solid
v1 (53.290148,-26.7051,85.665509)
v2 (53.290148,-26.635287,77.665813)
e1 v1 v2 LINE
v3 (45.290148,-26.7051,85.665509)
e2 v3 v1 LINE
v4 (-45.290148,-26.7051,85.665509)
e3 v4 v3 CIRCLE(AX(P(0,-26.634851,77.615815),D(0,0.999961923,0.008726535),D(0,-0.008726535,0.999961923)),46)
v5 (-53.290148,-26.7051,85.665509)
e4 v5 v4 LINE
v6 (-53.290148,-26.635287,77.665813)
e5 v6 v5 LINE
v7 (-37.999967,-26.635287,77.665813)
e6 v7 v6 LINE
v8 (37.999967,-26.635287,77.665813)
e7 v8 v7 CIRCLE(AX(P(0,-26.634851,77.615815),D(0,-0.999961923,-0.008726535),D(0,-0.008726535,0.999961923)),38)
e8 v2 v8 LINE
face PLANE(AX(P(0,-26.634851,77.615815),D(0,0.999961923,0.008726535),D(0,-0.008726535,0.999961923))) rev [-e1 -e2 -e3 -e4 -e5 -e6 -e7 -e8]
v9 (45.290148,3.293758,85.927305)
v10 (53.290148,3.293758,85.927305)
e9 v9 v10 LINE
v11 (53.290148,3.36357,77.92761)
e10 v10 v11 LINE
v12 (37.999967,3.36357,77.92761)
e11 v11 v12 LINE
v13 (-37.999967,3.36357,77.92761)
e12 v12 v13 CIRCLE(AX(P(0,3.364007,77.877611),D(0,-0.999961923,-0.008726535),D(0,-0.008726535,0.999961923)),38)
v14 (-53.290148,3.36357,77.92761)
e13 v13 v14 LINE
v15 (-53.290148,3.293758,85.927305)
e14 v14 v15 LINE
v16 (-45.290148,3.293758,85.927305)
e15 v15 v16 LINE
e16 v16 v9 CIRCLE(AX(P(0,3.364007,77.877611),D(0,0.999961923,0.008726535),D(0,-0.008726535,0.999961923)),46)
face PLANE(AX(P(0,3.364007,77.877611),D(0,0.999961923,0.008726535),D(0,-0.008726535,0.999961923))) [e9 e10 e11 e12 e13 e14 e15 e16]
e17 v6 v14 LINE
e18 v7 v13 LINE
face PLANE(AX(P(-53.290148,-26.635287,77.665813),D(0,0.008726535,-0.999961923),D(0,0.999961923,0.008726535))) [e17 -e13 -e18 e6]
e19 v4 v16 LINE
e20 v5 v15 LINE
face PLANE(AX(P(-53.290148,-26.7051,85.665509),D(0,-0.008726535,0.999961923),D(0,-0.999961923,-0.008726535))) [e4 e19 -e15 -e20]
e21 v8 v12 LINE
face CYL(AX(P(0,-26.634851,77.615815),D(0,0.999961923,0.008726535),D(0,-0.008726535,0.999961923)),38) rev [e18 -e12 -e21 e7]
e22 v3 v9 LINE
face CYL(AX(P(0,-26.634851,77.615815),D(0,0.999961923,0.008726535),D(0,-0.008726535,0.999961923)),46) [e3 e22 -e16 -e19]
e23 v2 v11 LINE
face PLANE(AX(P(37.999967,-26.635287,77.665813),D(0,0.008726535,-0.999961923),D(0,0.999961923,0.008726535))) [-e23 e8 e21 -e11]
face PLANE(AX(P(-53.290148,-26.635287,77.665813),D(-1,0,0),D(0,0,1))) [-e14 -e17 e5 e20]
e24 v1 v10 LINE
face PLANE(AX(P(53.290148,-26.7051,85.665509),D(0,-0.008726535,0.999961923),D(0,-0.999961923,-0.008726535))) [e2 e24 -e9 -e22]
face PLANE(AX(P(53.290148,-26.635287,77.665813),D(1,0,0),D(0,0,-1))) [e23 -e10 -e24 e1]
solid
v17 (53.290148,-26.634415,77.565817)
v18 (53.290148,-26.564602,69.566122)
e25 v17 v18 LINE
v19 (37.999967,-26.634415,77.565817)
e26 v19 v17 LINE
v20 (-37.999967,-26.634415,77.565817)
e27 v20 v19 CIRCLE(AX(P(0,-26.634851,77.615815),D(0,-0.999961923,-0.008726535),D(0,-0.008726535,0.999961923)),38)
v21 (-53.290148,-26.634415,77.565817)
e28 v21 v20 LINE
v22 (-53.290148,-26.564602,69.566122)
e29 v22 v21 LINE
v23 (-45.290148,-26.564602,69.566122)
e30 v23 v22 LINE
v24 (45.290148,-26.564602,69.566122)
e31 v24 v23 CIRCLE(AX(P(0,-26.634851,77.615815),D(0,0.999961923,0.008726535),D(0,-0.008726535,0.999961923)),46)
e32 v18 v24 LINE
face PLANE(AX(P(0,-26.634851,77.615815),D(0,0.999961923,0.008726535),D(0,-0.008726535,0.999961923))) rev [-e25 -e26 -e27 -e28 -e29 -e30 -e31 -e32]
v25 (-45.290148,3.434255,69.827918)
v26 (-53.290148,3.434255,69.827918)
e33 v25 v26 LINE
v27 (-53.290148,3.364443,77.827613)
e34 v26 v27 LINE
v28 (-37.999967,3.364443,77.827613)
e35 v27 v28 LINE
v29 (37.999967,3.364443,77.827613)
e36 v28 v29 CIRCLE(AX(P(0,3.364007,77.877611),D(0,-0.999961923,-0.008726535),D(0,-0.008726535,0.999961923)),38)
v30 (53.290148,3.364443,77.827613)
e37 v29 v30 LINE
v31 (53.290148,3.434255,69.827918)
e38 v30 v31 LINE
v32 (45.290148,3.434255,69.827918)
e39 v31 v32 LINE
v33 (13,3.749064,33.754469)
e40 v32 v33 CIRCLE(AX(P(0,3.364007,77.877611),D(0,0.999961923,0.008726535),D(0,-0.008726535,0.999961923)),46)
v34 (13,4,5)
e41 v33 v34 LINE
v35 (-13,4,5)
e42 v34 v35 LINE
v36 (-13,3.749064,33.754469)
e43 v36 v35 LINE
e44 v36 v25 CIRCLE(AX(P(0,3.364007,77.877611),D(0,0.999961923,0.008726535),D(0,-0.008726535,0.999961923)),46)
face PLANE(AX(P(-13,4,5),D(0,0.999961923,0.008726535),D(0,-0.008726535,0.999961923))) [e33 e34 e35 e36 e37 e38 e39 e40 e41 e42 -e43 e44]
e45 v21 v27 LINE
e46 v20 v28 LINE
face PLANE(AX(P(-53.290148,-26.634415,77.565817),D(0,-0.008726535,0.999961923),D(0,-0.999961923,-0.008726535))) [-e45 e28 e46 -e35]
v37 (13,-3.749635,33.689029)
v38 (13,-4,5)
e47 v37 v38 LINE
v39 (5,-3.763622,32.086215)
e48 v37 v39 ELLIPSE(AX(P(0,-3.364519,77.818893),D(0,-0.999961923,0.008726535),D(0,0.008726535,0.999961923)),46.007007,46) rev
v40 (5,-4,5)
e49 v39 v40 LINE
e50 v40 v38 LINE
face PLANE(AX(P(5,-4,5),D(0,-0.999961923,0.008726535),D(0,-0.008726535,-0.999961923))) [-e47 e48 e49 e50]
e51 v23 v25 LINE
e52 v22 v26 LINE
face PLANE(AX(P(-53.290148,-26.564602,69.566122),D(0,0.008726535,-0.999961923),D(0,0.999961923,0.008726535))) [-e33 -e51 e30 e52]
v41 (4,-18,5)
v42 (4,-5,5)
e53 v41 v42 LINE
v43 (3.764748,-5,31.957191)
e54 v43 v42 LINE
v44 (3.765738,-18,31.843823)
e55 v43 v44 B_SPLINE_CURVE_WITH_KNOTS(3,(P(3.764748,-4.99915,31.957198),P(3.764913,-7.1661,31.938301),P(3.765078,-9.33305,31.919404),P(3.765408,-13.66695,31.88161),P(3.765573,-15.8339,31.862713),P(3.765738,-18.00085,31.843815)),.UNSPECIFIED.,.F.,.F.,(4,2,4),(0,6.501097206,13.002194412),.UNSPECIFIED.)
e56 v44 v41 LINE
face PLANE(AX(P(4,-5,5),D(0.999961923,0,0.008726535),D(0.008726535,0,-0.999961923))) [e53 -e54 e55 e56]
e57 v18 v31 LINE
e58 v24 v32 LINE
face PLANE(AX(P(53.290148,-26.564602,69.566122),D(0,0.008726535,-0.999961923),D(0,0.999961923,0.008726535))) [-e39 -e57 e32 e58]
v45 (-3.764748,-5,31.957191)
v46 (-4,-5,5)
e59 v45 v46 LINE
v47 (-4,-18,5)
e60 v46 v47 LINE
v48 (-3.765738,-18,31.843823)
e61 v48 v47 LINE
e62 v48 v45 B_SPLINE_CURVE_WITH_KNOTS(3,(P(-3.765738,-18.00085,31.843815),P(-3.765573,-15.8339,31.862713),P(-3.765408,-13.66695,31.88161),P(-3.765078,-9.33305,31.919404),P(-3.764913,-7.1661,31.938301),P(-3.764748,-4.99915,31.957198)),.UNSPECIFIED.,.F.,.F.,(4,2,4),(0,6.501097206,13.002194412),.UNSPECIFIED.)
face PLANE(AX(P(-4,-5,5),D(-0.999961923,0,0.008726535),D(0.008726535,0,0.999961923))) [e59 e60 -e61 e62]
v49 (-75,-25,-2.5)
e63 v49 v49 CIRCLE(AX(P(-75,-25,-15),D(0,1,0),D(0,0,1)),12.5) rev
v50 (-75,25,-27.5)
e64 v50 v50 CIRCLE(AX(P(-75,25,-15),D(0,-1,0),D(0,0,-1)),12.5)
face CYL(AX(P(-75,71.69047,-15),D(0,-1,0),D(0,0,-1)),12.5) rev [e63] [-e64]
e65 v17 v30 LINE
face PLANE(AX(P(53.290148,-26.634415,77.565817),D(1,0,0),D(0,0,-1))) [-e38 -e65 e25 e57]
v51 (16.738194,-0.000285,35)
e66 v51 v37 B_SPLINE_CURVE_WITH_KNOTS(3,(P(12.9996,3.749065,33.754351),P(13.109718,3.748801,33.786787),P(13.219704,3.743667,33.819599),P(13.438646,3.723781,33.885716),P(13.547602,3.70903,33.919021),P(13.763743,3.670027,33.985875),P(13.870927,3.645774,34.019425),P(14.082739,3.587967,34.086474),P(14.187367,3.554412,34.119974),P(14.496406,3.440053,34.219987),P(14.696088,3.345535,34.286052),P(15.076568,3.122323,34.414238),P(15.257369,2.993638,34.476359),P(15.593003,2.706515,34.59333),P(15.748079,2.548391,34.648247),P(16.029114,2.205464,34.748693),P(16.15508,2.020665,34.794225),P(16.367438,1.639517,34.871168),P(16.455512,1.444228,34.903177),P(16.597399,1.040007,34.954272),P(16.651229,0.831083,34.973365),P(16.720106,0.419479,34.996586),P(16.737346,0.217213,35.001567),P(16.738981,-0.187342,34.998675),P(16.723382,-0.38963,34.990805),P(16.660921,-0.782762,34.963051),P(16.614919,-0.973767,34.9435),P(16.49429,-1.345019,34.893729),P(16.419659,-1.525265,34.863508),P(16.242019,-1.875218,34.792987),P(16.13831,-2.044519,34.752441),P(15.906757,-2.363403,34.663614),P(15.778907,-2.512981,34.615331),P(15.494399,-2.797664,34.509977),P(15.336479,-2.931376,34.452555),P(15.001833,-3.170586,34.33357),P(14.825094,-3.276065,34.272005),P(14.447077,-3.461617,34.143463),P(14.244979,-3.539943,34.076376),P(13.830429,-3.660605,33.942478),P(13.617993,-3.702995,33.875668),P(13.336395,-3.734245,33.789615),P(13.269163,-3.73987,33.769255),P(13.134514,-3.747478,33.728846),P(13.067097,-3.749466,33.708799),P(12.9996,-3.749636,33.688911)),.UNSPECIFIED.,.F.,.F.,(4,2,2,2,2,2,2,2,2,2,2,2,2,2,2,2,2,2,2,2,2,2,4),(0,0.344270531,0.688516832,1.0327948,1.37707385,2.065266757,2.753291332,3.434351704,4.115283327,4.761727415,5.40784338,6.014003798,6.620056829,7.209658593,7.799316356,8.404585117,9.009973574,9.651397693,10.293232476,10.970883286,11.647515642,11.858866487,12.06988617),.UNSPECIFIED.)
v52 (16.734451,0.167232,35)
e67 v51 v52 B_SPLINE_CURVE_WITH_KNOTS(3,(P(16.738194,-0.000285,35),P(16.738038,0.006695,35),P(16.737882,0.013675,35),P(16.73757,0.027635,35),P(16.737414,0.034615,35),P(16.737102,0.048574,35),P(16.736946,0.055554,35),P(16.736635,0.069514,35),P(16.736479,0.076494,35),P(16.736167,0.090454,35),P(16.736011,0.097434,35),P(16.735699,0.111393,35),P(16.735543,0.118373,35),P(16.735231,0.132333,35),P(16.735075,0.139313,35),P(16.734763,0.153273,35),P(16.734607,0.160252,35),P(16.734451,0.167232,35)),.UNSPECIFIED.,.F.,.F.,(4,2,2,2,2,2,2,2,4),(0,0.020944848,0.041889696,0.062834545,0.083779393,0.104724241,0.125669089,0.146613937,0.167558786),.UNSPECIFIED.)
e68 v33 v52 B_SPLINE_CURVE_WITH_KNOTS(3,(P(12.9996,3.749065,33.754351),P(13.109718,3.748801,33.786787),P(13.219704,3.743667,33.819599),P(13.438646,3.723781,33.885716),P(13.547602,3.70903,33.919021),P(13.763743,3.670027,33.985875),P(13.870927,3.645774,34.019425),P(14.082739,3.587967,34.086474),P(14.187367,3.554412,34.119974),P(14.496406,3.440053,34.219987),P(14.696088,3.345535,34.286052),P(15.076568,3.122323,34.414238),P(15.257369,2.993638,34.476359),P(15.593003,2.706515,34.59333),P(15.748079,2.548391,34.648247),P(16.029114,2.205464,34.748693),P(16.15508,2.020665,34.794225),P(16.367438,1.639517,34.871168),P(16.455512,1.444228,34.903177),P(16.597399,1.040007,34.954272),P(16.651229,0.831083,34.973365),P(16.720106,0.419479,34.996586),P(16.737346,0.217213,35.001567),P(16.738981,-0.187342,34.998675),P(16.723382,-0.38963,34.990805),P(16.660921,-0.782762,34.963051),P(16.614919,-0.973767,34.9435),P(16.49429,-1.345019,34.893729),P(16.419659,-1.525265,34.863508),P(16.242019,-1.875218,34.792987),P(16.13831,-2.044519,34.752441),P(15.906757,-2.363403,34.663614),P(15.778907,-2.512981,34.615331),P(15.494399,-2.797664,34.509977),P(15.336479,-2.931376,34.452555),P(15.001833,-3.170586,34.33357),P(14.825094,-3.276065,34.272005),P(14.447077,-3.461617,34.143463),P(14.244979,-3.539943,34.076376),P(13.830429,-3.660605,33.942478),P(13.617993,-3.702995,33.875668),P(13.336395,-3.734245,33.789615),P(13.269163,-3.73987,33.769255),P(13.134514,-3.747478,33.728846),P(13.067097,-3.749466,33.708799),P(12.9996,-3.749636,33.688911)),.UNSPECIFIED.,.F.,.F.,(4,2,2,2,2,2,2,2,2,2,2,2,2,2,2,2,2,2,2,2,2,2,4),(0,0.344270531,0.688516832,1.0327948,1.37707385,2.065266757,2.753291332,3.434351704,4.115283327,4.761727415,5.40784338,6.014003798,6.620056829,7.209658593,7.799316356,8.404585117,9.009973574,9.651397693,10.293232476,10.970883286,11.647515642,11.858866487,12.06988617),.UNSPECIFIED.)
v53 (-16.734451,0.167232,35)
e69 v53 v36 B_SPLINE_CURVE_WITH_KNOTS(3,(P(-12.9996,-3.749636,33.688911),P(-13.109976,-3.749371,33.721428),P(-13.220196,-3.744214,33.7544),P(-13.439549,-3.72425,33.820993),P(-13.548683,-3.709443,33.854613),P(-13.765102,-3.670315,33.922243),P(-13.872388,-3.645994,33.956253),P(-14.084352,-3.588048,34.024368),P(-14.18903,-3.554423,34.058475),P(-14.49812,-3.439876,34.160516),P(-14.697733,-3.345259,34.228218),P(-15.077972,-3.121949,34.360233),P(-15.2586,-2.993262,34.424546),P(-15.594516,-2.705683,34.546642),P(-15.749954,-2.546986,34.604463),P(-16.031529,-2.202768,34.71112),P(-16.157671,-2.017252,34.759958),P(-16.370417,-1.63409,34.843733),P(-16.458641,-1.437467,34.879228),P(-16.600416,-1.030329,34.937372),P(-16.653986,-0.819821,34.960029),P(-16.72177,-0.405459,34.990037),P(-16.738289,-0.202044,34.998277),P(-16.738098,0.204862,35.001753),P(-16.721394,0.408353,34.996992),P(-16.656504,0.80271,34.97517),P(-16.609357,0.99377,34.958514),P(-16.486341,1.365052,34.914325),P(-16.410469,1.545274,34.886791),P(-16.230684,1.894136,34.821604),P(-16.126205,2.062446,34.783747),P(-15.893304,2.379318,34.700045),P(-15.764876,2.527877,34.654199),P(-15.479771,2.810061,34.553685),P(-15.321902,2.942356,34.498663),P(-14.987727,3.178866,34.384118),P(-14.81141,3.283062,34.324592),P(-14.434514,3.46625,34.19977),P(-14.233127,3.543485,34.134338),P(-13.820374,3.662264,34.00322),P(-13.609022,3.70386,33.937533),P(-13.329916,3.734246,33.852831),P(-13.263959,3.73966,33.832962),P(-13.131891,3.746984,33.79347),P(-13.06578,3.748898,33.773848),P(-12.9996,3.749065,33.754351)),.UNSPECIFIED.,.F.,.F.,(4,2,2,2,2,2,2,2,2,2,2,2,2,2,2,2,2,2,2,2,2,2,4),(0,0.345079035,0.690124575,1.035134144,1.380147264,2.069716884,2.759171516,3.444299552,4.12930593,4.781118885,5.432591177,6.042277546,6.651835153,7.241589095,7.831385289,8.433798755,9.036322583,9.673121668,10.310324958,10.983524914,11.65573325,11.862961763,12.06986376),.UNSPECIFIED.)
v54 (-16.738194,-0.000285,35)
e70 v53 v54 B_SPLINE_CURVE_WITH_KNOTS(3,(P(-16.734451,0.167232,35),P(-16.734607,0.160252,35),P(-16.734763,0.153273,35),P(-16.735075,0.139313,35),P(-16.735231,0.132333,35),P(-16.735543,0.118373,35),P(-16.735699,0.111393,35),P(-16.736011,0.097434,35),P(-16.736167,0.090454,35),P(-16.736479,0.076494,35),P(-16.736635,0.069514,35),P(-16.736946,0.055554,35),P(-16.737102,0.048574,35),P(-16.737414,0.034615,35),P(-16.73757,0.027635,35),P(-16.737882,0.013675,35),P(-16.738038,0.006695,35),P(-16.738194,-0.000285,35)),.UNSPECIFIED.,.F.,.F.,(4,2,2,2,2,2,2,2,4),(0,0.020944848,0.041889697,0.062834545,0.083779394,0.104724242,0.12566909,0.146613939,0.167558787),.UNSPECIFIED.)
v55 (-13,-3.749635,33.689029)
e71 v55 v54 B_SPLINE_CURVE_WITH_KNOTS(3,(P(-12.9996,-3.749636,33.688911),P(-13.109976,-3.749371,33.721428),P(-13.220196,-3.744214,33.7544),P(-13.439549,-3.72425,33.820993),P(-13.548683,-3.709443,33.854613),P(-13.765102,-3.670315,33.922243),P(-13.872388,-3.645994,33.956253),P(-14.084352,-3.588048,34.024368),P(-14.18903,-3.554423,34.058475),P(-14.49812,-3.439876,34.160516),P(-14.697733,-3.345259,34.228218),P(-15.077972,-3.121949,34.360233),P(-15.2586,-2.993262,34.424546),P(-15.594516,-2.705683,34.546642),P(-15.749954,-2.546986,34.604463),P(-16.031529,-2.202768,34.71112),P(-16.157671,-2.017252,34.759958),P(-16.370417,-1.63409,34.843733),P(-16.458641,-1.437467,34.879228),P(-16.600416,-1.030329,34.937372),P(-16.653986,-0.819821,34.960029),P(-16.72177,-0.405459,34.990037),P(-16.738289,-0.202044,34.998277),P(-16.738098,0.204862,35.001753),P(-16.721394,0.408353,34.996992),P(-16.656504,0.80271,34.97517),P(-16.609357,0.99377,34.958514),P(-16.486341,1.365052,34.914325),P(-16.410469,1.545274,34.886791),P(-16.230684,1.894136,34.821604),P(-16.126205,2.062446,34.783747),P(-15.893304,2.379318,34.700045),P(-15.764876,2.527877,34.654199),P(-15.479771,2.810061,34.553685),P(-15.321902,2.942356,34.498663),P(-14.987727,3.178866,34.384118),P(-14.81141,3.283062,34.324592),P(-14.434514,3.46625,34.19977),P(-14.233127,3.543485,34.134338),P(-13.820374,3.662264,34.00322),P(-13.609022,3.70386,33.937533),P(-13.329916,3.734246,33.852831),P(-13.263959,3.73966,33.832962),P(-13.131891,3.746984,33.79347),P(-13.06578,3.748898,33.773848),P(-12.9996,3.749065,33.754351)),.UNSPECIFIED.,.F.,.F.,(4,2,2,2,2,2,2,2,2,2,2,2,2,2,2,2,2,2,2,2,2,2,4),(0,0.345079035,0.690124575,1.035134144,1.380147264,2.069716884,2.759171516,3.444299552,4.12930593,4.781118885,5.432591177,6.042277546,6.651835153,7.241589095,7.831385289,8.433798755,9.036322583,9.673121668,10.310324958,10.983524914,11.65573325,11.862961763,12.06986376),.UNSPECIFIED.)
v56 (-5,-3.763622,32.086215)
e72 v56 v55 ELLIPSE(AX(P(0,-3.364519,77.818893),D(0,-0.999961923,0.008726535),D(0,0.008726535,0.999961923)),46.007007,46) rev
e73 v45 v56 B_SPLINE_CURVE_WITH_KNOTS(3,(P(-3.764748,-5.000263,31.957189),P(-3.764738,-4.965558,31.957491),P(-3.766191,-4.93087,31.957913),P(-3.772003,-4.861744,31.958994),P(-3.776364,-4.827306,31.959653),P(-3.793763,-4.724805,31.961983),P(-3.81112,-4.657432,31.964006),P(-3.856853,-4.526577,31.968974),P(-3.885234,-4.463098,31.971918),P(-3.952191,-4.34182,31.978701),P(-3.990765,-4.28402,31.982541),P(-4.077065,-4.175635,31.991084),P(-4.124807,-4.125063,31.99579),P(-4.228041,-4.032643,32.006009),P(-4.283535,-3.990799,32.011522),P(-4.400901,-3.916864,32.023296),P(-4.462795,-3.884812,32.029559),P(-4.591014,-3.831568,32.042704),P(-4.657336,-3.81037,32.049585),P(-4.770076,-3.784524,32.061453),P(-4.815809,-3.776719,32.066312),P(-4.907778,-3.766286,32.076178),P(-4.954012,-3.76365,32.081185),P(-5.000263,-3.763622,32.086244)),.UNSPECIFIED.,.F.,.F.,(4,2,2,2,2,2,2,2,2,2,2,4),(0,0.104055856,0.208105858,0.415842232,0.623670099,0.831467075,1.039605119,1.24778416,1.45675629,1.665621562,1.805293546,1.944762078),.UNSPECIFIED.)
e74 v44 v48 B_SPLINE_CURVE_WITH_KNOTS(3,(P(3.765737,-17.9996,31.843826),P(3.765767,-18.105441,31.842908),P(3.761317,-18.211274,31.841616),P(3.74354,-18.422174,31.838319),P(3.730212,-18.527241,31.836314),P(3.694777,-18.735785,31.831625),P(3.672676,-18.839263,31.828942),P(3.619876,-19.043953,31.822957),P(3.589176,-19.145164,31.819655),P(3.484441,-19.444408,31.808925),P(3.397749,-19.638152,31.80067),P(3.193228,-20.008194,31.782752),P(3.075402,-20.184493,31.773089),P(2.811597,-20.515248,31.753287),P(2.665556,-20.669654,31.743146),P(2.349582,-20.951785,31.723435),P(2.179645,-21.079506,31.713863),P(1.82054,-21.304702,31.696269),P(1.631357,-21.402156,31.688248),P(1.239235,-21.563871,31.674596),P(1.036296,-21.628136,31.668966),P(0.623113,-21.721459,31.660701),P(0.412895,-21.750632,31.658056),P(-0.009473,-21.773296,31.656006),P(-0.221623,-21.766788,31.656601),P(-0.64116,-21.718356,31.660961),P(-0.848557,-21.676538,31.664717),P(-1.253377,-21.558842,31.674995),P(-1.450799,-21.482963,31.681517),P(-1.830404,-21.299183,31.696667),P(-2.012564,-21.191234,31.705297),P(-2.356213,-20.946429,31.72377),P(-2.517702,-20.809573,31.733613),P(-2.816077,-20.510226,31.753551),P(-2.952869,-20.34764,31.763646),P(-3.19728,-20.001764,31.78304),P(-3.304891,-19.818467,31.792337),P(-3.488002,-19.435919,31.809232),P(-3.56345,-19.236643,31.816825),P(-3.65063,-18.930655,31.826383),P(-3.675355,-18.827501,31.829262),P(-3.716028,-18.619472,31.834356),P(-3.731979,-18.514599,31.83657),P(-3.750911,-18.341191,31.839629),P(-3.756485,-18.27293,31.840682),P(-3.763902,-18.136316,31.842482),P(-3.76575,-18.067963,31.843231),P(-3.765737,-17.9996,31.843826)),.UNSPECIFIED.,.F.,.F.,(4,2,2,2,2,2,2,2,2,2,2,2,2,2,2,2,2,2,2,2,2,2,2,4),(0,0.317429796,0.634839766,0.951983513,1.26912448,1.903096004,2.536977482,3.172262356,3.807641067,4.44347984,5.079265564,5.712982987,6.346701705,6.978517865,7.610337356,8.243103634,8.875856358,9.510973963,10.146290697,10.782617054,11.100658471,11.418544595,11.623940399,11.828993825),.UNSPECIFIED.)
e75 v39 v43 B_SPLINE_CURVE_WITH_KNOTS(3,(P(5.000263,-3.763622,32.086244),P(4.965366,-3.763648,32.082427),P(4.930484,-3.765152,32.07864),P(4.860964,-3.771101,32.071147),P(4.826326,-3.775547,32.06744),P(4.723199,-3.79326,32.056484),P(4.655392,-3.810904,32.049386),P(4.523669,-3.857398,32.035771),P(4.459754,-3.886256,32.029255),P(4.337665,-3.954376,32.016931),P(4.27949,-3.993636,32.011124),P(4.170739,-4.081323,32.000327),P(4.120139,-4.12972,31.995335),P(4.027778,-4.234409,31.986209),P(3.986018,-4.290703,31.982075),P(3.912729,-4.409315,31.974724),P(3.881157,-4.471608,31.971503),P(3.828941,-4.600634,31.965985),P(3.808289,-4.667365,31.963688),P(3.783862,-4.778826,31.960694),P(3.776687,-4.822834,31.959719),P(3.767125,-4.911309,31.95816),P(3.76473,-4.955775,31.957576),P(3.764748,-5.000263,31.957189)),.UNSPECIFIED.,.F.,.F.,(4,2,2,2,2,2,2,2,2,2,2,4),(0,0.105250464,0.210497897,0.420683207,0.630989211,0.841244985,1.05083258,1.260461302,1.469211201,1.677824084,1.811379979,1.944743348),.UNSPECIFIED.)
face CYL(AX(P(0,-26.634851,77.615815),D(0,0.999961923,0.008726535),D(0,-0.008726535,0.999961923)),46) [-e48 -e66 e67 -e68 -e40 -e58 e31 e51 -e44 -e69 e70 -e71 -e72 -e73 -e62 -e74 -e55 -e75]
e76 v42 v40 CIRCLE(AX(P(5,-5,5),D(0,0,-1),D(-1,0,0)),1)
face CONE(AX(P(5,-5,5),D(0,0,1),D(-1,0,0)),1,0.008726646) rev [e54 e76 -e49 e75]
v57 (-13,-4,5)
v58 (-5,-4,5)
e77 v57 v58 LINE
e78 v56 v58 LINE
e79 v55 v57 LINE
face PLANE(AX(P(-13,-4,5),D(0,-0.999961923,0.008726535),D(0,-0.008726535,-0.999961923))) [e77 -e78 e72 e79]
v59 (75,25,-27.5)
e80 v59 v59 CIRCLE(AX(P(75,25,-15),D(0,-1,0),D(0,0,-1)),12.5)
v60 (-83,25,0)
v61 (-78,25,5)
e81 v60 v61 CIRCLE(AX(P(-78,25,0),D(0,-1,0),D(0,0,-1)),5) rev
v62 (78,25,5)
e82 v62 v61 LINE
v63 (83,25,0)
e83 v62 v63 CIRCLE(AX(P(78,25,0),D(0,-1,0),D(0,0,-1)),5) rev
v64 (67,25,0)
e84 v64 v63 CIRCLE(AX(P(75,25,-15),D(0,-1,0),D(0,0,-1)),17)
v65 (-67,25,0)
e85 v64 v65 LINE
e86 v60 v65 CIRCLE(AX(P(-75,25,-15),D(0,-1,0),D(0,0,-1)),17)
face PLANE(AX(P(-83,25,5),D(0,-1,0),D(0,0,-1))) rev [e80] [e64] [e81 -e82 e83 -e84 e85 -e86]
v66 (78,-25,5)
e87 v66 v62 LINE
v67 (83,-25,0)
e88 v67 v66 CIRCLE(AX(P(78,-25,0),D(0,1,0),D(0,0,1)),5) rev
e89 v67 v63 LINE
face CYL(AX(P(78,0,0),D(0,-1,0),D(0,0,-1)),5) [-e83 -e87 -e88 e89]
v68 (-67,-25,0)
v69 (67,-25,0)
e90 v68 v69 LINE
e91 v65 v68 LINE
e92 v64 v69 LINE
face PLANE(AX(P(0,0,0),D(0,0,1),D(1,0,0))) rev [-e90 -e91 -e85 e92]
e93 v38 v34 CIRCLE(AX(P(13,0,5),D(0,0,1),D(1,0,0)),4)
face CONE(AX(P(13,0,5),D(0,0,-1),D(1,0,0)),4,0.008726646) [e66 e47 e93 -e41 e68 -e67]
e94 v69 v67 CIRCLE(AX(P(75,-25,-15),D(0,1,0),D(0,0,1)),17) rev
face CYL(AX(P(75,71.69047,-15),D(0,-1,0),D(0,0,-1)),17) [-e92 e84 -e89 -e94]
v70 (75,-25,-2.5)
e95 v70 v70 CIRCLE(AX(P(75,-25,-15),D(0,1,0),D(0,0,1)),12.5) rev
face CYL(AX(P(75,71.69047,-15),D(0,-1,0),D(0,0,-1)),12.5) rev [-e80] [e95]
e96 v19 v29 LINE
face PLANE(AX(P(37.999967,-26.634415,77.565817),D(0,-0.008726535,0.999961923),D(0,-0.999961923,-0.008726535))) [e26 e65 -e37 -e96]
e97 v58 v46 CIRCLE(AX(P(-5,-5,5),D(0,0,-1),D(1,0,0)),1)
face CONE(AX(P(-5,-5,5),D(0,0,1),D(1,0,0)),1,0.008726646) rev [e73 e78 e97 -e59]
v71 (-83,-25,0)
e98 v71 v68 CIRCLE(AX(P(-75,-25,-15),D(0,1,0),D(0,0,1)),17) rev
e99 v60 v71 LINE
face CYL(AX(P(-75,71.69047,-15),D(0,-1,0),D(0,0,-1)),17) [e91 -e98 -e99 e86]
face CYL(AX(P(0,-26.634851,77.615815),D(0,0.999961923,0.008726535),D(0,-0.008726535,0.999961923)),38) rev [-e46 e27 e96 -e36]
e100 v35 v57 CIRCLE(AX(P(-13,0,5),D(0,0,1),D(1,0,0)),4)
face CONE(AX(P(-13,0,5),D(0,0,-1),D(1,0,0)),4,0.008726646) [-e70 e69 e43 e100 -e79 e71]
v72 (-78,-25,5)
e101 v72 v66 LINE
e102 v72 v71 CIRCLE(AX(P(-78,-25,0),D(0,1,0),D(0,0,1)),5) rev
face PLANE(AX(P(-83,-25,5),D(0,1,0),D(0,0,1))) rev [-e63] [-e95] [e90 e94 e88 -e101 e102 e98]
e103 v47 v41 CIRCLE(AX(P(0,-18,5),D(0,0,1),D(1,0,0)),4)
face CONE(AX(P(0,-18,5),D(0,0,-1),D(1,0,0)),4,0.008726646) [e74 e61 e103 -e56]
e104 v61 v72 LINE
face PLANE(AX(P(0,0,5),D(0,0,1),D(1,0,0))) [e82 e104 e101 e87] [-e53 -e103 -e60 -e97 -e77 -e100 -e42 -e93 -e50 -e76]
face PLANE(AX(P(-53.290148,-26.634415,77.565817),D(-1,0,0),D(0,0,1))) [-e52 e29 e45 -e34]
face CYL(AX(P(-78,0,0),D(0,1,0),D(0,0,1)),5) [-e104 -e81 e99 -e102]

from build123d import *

# Parameters (mm, degrees)
SKETCH_1_W                  = 166
SKETCH_1_H                  = 50
EXTRUDE_1_DEPTH             = 5
EXTRUDE_4_REACH             = 88.827
SKETCH_4_R                  = 12.5
EXTRUDE_4_DIRECTION_2_REACH = 88.827
FILLET_1_R                  = 5
EXTRUDE_2_DEPTH             = 30
EXTRUDE_2_TAPER             = 0.5
EXTRUDE_3_DEPTH             = 30


with BuildPart() as part:
    # Эскиз1 → Бобышка-Вытянуть1 (new body)
    with BuildSketch(Plane.XY):
        Rectangle(SKETCH_1_W, SKETCH_1_H)
    extrude(amount=EXTRUDE_1_DEPTH)

    # Бобышка-Вытянуть4: up to this face of the body (flat: up to its plane)
    extrude_4_end = Plane(part.part.faces().sort_by_distance((0, 25, 2.5))[0])
    # Эскиз4 → Бобышка-Вытянуть4 (add, up to the picked face)
    with BuildSketch(Plane(origin=(0, 0, 0), x_dir=(1, 0, 0), z_dir=(0, 1, 0)), mode=Mode.PRIVATE) as extrude_4_sk1:
        with BuildLine():
            Line((-83, 0), (-67, 0))
            ThreePointArc((-67, 0), (-75, 32), (-83, 0))
        make_face()
        with Locations(Location((-75, 15, 0), (0, 0, 90))):
            Circle(SKETCH_4_R, mode=Mode.SUBTRACT)
    extrude_4_tool1 = split(extrude(extrude_4_sk1.sketch, amount=EXTRUDE_4_REACH, mode=Mode.PRIVATE), bisect_by=extrude_4_end, keep=Keep.BOTH, mode=Mode.PRIVATE)
    # Эскиз4 → Бобышка-Вытянуть4 (add, up to the picked face)
    with BuildSketch(Plane(origin=(0, 0, 0), x_dir=(1, 0, 0), z_dir=(0, 1, 0)), mode=Mode.PRIVATE) as extrude_4_sk2:
        with BuildLine():
            Line((83, 0), (67, 0))
            ThreePointArc((67, 0), (75, 32), (83, 0))
        make_face()
        with Locations(Location((75, 15, 0), (0, 0, 90))):
            Circle(SKETCH_4_R, mode=Mode.SUBTRACT)
    extrude_4_tool2 = split(extrude(extrude_4_sk2.sketch, amount=EXTRUDE_4_REACH, mode=Mode.PRIVATE), bisect_by=extrude_4_end, keep=Keep.BOTH, mode=Mode.PRIVATE)
    add(extrude_4_tool1.solids().sort_by(Axis((-75, 0, -31.533095), (0, 1, 0)))[0])
    add(extrude_4_tool2.solids().sort_by(Axis((75, 0, -31.533095), (0, 1, 0)))[0])

    # Бобышка-Вытянуть4 direction 2: up to this face of the body (flat: up to its plane)
    extrude_4_direction_2_end = Plane(part.part.faces().sort_by_distance((0, -25, 2.5))[0])
    # Эскиз4 → Бобышка-Вытянуть4 direction 2 (add, up to the picked face)
    with BuildSketch(Plane(origin=(0, 0, 0), x_dir=(1, 0, 0), z_dir=(0, 1, 0)), mode=Mode.PRIVATE) as extrude_4_direction_2_sk1:
        with BuildLine():
            Line((-83, 0), (-67, 0))
            ThreePointArc((-67, 0), (-75, 32), (-83, 0))
        make_face()
        with Locations(Location((-75, 15, 0), (0, 0, 90))):
            Circle(SKETCH_4_R, mode=Mode.SUBTRACT)
    extrude_4_direction_2_tool1 = split(extrude(extrude_4_direction_2_sk1.sketch, amount=-EXTRUDE_4_DIRECTION_2_REACH, mode=Mode.PRIVATE), bisect_by=extrude_4_direction_2_end, keep=Keep.BOTH, mode=Mode.PRIVATE)
    # Эскиз4 → Бобышка-Вытянуть4 direction 2 (add, up to the picked face)
    with BuildSketch(Plane(origin=(0, 0, 0), x_dir=(1, 0, 0), z_dir=(0, 1, 0)), mode=Mode.PRIVATE) as extrude_4_direction_2_sk2:
        with BuildLine():
            Line((83, 0), (67, 0))
            ThreePointArc((67, 0), (75, 32), (83, 0))
        make_face()
        with Locations(Location((75, 15, 0), (0, 0, 90))):
            Circle(SKETCH_4_R, mode=Mode.SUBTRACT)
    extrude_4_direction_2_tool2 = split(extrude(extrude_4_direction_2_sk2.sketch, amount=-EXTRUDE_4_DIRECTION_2_REACH, mode=Mode.PRIVATE), bisect_by=extrude_4_direction_2_end, keep=Keep.BOTH, mode=Mode.PRIVATE)
    add(extrude_4_direction_2_tool1.solids().sort_by(Axis((-75, 0, -31.533095), (0, -1, 0)))[0])
    add(extrude_4_direction_2_tool2.solids().sort_by(Axis((75, 0, -31.533095), (0, -1, 0)))[0])

    # Скругление1
    fillet_1_edges = [part.edges().sort_by_distance(p)[0] for p in [
        (83, 0, 5),
        (-83, 0, 5),
    ]]
    fillet(fillet_1_edges, radius=FILLET_1_R - 0.0001)  # a hair under: the kernel refuses the full size

    # Эскиз2 → Бобышка-Вытянуть2 (add)
    with BuildSketch(Plane.XY.offset(5)):
        with BuildLine():
            ThreePointArc((-13, 4), (-17, 0), (-13, -4))
            Line((-13, -4), (-5, -4))
            ThreePointArc((-5, -4), (-4.292893219, -4.292893219), (-4, -5))
            Line((-4, -5), (-4, -18))
            ThreePointArc((-4, -18), (0, -22), (4, -18))
            Line((4, -18), (4, -5))
            ThreePointArc((4, -5), (4.292893219, -4.292893219), (5, -4))
            Line((5, -4), (13, -4))
            ThreePointArc((13, -4), (17, 0), (13, 4))
            Line((13, 4), (-13, 4))
        make_face()
    extrude(amount=EXTRUDE_2_DEPTH, taper=EXTRUDE_2_TAPER)

    # Эскиз3 → Бобышка-Вытянуть3 (add)
    with BuildSketch(Plane(origin=(0, 4.043326406, 0.035285575), x_dir=(1, 0, 0), z_dir=(0, 0.9999619230641713, 0.008726535498373954))):
        with BuildLine():
            Line((37.999967105, -77.795289998), (53.290147935, -77.795289998))
            Line((53.290147935, -77.795289998), (53.290147935, -69.795289998))
            Line((53.290147935, -69.795289998), (45.290147935, -69.795289998))
            ThreePointArc((45.290147935, -69.795289998), (0, -31.845289998), (-45.290147935, -69.795289998))
            Line((-45.290147935, -69.795289998), (-53.290147935, -69.795289998))
            Line((-53.290147935, -69.795289998), (-53.290147935, -77.795289998))
            Line((-53.290147935, -77.795289998), (-37.999967105, -77.795289998))
            ThreePointArc((-37.999967105, -77.795289998), (0, -39.845289998), (37.999967105, -77.795289998))
        make_face()
        with BuildLine():
            Line((-53.290147935, -77.895289998), (-37.999967105, -77.895289998))
            ThreePointArc((-37.999967105, -77.895289998), (0, -115.845289998), (37.999967105, -77.895289998))
            Line((37.999967105, -77.895289998), (53.290147935, -77.895289998))
            Line((53.290147935, -77.895289998), (53.290147935, -85.895289998))
            Line((53.290147935, -85.895289998), (45.290147935, -85.895289998))
            ThreePointArc((45.290147935, -85.895289998), (0, -123.845289998), (-45.290147935, -85.895289998))
            Line((-45.290147935, -85.895289998), (-53.290147935, -85.895289998))
            Line((-53.290147935, -85.895289998), (-53.290147935, -77.895289998))
        make_face()
    extrude(amount=-EXTRUDE_3_DEPTH)


with BuildPart() as extrude_3_piece_1:
    # of the separate pieces the step leaves, piece 1, a body of its own (extrude_3_pieces)
    add(part.part.solids().sort_by_distance((-83, 25, 0.0001))[0])


with BuildPart() as extrude_3_piece_2:
    # of the separate pieces the step leaves, piece 2, a body of its own (extrude_3_pieces)
    add(part.part.solids().sort_by_distance((-45.290147935, 3.293758109, 85.927304944))[0])


solid = Compound([extrude_3_piece_1.part, extrude_3_piece_2.part])
